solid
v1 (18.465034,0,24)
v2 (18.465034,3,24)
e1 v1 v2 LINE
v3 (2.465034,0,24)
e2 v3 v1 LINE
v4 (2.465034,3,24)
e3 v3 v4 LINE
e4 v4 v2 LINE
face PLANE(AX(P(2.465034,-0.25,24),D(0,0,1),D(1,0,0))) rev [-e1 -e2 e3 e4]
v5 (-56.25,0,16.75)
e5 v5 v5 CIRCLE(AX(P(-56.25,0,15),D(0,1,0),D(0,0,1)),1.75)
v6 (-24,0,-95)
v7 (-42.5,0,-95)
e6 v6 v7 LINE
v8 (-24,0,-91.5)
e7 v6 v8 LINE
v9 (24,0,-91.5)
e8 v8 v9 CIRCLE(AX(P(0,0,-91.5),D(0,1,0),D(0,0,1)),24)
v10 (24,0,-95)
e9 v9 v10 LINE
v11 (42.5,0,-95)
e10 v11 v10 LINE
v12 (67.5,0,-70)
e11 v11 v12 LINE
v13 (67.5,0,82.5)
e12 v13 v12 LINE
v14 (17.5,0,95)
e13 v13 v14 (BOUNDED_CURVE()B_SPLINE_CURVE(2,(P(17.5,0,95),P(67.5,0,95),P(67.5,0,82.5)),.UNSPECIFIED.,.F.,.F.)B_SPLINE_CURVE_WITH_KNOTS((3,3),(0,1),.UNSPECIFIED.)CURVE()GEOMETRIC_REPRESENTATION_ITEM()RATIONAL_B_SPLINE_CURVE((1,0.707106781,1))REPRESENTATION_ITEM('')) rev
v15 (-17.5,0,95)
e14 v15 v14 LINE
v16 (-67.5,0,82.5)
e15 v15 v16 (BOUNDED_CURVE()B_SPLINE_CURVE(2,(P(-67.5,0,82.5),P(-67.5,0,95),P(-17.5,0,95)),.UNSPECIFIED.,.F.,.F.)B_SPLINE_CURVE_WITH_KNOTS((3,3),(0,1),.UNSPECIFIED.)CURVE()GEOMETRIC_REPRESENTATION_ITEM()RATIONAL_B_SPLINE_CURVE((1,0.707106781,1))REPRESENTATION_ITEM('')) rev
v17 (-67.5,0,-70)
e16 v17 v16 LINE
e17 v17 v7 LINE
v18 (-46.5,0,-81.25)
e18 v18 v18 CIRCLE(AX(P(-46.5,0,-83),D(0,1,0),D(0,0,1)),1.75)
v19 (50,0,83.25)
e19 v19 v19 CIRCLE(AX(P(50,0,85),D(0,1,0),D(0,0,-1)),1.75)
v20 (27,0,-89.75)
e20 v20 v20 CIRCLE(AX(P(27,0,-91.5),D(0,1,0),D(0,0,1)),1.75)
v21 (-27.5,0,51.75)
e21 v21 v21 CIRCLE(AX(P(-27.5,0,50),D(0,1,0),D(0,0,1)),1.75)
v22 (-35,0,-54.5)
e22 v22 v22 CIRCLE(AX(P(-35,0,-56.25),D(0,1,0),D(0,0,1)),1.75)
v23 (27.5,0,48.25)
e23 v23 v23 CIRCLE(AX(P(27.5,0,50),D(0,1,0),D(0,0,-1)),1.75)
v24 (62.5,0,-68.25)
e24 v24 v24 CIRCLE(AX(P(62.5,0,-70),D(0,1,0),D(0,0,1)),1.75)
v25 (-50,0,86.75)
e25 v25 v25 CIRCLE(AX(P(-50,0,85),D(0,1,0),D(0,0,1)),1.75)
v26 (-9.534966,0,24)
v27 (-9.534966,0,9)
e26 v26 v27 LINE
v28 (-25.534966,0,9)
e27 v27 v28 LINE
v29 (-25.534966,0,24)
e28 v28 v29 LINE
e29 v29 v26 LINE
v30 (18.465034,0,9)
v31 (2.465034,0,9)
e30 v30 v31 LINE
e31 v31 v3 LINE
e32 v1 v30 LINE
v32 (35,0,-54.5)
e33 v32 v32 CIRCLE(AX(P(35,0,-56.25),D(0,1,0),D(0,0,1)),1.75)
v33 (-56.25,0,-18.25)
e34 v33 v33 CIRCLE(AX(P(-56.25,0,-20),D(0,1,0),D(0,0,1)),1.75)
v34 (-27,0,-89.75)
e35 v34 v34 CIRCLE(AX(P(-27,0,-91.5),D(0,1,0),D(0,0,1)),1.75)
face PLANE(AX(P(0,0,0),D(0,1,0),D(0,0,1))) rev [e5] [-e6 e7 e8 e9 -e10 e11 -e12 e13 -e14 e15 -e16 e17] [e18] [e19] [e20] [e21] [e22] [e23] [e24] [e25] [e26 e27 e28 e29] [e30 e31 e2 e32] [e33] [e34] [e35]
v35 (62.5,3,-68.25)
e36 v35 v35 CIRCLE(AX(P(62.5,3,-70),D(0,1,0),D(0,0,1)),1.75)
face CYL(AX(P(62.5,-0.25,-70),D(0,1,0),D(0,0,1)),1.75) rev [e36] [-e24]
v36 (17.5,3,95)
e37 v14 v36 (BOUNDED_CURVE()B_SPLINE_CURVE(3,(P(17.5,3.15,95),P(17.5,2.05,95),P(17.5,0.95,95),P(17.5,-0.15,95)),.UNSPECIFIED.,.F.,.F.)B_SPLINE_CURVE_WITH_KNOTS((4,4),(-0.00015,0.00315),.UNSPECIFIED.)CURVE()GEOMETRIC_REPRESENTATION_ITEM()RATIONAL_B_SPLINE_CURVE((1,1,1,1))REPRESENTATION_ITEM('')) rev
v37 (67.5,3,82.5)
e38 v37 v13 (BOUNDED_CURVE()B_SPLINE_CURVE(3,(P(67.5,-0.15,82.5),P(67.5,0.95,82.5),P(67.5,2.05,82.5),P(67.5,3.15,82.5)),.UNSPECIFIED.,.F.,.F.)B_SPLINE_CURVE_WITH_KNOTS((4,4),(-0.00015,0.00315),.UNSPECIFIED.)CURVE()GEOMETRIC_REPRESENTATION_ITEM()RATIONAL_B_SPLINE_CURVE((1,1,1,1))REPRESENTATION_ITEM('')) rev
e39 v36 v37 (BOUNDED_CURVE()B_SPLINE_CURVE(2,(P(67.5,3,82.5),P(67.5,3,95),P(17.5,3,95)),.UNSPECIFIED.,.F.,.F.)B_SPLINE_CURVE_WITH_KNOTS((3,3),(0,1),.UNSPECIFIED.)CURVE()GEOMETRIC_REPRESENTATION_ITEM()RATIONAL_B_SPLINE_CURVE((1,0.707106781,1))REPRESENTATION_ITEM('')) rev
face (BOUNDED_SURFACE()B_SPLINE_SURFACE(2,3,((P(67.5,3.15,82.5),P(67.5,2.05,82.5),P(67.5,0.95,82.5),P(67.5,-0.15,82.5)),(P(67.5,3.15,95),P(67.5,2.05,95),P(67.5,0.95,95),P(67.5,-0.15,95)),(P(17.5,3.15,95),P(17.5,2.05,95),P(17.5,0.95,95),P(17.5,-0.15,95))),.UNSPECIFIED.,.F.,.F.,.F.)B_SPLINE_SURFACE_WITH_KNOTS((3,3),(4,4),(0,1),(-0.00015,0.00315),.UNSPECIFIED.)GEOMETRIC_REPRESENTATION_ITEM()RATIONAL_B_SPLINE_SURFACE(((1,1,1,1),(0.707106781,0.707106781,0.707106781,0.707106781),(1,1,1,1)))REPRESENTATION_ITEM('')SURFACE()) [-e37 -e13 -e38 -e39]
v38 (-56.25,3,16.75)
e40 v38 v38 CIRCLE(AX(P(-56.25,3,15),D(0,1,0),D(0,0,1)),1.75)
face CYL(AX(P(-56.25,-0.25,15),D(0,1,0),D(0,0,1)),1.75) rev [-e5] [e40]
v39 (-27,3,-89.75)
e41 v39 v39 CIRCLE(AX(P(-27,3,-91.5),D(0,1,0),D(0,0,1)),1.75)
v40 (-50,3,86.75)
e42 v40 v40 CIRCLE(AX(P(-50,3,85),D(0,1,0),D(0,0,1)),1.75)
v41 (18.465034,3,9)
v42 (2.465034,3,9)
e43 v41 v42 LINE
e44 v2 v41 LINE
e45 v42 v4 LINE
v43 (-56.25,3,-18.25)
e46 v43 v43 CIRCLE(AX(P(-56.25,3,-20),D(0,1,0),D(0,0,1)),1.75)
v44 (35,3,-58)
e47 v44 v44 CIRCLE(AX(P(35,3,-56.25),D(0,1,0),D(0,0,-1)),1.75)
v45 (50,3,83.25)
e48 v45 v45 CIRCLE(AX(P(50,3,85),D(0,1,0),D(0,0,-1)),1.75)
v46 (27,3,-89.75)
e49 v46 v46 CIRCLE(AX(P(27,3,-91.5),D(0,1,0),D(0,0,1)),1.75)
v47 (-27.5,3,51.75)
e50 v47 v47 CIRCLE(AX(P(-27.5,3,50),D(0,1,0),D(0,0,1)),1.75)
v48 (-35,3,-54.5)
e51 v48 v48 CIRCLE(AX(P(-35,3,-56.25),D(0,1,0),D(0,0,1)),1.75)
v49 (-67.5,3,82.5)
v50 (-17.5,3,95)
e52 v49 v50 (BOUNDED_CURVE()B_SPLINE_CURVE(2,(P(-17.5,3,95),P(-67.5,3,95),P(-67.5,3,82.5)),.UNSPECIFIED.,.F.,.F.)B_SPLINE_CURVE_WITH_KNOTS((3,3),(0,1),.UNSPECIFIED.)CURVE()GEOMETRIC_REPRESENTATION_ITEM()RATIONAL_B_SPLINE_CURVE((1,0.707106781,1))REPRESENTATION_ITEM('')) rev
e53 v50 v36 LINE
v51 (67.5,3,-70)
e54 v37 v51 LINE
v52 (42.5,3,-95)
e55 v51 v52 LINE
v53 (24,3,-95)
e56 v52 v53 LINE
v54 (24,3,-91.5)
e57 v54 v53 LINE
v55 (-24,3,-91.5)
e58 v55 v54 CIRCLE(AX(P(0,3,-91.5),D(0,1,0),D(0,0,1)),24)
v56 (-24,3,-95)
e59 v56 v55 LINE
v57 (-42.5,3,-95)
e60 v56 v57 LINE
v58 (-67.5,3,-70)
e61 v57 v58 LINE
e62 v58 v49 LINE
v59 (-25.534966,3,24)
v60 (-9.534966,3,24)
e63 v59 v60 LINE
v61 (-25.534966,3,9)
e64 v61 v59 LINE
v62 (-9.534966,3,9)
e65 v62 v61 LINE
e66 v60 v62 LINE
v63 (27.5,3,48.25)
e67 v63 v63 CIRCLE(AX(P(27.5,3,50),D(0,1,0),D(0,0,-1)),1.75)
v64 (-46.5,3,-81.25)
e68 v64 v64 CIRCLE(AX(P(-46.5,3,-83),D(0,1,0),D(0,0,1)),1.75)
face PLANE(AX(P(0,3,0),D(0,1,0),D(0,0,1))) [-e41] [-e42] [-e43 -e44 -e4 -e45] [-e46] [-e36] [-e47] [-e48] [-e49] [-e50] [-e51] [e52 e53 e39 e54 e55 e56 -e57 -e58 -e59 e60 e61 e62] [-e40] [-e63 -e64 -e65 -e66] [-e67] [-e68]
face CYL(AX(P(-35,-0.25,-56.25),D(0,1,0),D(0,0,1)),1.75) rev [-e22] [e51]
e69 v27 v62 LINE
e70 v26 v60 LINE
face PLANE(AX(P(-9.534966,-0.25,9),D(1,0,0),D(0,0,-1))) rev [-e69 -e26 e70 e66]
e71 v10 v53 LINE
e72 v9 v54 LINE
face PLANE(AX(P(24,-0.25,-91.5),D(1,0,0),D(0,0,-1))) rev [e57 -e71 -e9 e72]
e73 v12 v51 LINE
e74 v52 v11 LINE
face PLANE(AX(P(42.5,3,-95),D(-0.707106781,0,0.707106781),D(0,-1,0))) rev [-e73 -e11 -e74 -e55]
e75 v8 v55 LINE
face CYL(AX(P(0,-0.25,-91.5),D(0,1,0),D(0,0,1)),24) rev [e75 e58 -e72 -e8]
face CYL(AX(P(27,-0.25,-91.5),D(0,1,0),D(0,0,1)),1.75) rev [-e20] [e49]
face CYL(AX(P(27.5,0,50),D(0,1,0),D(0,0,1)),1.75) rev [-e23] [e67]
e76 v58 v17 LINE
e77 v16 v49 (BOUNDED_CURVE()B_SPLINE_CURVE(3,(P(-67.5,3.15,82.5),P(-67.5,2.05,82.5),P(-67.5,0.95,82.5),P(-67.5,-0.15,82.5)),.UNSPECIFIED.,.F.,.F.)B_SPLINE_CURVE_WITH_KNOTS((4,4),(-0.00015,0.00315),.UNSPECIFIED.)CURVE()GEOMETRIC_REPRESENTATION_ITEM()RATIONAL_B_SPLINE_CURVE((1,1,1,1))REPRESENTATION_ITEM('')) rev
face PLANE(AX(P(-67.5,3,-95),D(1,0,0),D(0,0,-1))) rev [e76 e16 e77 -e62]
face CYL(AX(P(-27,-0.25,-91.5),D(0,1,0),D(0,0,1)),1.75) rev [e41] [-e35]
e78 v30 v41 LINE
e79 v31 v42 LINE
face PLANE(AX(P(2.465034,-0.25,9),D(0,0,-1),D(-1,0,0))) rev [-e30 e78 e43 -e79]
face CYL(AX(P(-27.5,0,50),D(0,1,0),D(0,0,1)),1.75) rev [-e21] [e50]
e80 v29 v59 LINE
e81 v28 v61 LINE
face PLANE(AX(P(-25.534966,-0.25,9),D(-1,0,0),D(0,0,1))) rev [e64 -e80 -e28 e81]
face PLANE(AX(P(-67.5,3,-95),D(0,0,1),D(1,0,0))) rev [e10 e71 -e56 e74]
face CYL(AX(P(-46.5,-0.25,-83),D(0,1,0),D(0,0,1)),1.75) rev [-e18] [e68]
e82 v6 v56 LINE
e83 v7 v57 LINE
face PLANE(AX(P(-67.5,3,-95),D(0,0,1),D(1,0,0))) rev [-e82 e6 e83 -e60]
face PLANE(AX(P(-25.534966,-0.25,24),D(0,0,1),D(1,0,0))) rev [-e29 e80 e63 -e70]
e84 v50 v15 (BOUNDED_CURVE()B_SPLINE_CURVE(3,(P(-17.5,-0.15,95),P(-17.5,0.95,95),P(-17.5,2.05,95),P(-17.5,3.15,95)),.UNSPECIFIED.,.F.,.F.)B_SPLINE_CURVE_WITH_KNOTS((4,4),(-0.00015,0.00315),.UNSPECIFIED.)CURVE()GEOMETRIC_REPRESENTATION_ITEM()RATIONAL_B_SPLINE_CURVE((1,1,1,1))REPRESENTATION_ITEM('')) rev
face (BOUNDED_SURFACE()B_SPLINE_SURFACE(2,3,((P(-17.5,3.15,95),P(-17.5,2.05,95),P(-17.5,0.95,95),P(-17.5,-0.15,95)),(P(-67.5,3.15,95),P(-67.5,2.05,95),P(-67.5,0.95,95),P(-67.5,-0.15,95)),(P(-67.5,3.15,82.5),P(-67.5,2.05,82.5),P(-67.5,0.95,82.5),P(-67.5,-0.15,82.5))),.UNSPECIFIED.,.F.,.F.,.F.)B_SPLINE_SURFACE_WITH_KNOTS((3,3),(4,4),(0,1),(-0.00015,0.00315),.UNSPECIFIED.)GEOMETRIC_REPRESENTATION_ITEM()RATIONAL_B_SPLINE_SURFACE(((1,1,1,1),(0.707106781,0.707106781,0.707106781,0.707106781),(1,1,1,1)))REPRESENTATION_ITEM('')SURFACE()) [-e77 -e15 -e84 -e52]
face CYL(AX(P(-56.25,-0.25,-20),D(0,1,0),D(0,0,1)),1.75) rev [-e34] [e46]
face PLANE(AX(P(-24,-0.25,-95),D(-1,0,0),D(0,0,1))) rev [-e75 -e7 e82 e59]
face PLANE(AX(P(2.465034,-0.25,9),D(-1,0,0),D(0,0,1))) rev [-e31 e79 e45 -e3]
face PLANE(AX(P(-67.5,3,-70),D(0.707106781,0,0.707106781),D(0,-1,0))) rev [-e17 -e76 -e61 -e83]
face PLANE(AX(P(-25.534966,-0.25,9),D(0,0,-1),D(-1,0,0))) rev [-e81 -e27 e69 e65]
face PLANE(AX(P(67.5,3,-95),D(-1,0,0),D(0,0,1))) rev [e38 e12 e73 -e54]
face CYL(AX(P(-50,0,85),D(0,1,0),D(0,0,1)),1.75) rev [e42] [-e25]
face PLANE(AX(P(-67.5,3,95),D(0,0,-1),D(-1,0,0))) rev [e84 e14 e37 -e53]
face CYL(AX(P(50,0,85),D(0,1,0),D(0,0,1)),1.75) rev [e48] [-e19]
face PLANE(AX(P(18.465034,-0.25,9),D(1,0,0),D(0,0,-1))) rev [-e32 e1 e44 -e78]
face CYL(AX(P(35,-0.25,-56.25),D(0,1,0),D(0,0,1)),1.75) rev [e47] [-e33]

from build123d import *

# Parameters (mm, degrees)
SKETCH2_W           = 135
SKETCH2_H           = 190
BOSS_EXTRUDE2_DEPTH = 3
SKETCH3_R           = 1.75
CUT_EXTRUDE1_DEPTH  = 117.577227622
FILLET1_SIZE        = 12.5
FILLET1_SIZE_2      = 50
FILLET2_SIZE        = 12.5
FILLET2_SIZE_2      = 50
CHAMFER2_SIZE       = 25
CHAMFER3_SIZE       = 25
CUT_EXTRUDE5_DEPTH  = 117.577227764
SKETCH8_R           = 1.75
CUT_EXTRUDE6_DEPTH  = 117.577227764
SKETCH9_R           = 1.75
CUT_EXTRUDE7_DEPTH  = 117.577227764
SKETCH11_R          = 1.75
CUT_EXTRUDE8_DEPTH  = 117.577227764
SKETCH12_W          = 16
SKETCH12_H          = 15
CUT_EXTRUDE9_DEPTH  = 117.577227764


with BuildPart() as part:
    # Sketch2 → Boss-Extrude2 (new body)
    with BuildSketch(Plane(origin=(0, 0, 0), x_dir=(1, 0, 0), z_dir=(0, 1, 0))):
        Rectangle(SKETCH2_W, SKETCH2_H)
    extrude(amount=BOSS_EXTRUDE2_DEPTH)

    # Sketch3 → Cut-Extrude1 (cut, through all)
    with BuildSketch(Plane(origin=(0, 3, 0), x_dir=(1, 0, 0), z_dir=(0, 1, 0))):
        with Locations(Location((-27.5, -50, 0), (0, 0, 270))):
            Circle(SKETCH3_R)
        with Locations(Location((27.5, -50, 0), (0, 0, 90))):
            Circle(SKETCH3_R)
        with Locations(Location((-50, -85, 0), (0, 0, 270))):
            Circle(SKETCH3_R)
        with Locations(Location((50, -85, 0), (0, 0, 90))):
            Circle(SKETCH3_R)
    extrude(amount=-CUT_EXTRUDE1_DEPTH, mode=Mode.SUBTRACT)

    # Fillet1
    # an asymmetric fillet: 50, 12.5 mm, written as the material it takes off along each edge
    with BuildSketch(Plane(origin=(-67.5, -125, 95), x_dir=(0, 0, -1), z_dir=(0, 1, 0))) as fillet1_piece_1:
        with BuildLine():
            Bezier((FILLET1_SIZE, 0), (0, 0), (0, -FILLET1_SIZE_2), weights=[1, 0.707106781, 1])
            Line((0, -FILLET1_SIZE_2), (0, 0))
            Line((0, 0), (FILLET1_SIZE, 0))
        make_face()
    extrude(amount=253, mode=Mode.SUBTRACT)

    # Fillet2
    # an asymmetric fillet: 50, 12.5 mm, written as the material it takes off along each edge
    with BuildSketch(Plane(origin=(67.5, -125, 95), x_dir=(0, 0, -1), z_dir=(0, 1, 0))) as fillet2_piece_1:
        with BuildLine():
            Bezier((FILLET2_SIZE, 0), (0, 0), (0, FILLET2_SIZE_2), weights=[1, 0.707106781, 1])
            Line((0, FILLET2_SIZE_2), (0, 0))
            Line((0, 0), (FILLET2_SIZE, 0))
        make_face()
    extrude(amount=253, mode=Mode.SUBTRACT)

    # Chamfer2
    chamfer2_edges = [part.edges().sort_by_distance(p)[0] for p in [
        (67.5, 1.5, -95),
    ]]
    chamfer(chamfer2_edges, length=CHAMFER2_SIZE)

    # Chamfer3
    chamfer3_edges = [part.edges().sort_by_distance(p)[0] for p in [
        (-67.5, 1.5, -95),
    ]]
    chamfer(chamfer3_edges, length=CHAMFER3_SIZE)

    # Sketch7 → Cut-Extrude5 (cut, through all)
    with BuildSketch(Plane(origin=(0, 3, 0), x_dir=(1, 0, 0), z_dir=(0, 1, 0))):
        with BuildLine():
            Line((24, 91.5), (24, 95))
            Line((24, 95), (-24, 95))
            Line((-24, 95), (-24, 91.5))
            ThreePointArc((-24, 91.5), (0, 67.5), (24, 91.5))
        make_face()
    extrude(amount=-CUT_EXTRUDE5_DEPTH, mode=Mode.SUBTRACT)

    # Sketch8 → Cut-Extrude6 (cut, through all)
    with BuildSketch(Plane(origin=(0, 3, 0), x_dir=(1, 0, 0), z_dir=(0, 1, 0))):
        with Locations(Location((-27, 91.5, 0), (0, 0, 270))):
            Circle(SKETCH8_R)
        with Locations(Location((27, 91.5, 0), (0, 0, 270))):
            Circle(SKETCH8_R)
    extrude(amount=-CUT_EXTRUDE6_DEPTH, mode=Mode.SUBTRACT)

    # Sketch9 → Cut-Extrude7 (cut, through all)
    with BuildSketch(Plane(origin=(0, 3, 0), x_dir=(1, 0, 0), z_dir=(0, 1, 0))):
        with Locations(Location((-56.25, -15, 0), (0, 0, 270))):
            Circle(SKETCH9_R)
        with Locations(Location((-35, 56.25, 0), (0, 0, 270))):
            Circle(SKETCH9_R)
        with Locations(Location((-56.25, 20, 0), (0, 0, 270))):
            Circle(SKETCH9_R)
        with Locations(Location((35, 56.25, 0), (0, 0, 270))):
            Circle(SKETCH9_R)
    extrude(amount=-CUT_EXTRUDE7_DEPTH, mode=Mode.SUBTRACT)

    # Sketch11 → Cut-Extrude8 (cut, through all)
    with BuildSketch(Plane(origin=(0, 3, 0), x_dir=(1, 0, 0), z_dir=(0, 1, 0))):
        with Locations(Location((62.5, 70, 0), (0, 0, 270))):
            Circle(SKETCH11_R)
        with Locations(Location((-46.5, 83, 0), (0, 0, 270))):
            Circle(SKETCH11_R)
    extrude(amount=-CUT_EXTRUDE8_DEPTH, mode=Mode.SUBTRACT)

    # Sketch12 → Cut-Extrude9 (cut, through all)
    with BuildSketch(Plane(origin=(0, 3, 0), x_dir=(1, 0, 0), z_dir=(0, 1, 0))):
        with Locations((-17.534965815, -16.5)):
            Rectangle(SKETCH12_W, SKETCH12_H)
        with Locations((10.465034185, -16.5)):
            Rectangle(SKETCH12_W, SKETCH12_H)
    extrude(amount=-CUT_EXTRUDE9_DEPTH, mode=Mode.SUBTRACT)


solid = part.part
